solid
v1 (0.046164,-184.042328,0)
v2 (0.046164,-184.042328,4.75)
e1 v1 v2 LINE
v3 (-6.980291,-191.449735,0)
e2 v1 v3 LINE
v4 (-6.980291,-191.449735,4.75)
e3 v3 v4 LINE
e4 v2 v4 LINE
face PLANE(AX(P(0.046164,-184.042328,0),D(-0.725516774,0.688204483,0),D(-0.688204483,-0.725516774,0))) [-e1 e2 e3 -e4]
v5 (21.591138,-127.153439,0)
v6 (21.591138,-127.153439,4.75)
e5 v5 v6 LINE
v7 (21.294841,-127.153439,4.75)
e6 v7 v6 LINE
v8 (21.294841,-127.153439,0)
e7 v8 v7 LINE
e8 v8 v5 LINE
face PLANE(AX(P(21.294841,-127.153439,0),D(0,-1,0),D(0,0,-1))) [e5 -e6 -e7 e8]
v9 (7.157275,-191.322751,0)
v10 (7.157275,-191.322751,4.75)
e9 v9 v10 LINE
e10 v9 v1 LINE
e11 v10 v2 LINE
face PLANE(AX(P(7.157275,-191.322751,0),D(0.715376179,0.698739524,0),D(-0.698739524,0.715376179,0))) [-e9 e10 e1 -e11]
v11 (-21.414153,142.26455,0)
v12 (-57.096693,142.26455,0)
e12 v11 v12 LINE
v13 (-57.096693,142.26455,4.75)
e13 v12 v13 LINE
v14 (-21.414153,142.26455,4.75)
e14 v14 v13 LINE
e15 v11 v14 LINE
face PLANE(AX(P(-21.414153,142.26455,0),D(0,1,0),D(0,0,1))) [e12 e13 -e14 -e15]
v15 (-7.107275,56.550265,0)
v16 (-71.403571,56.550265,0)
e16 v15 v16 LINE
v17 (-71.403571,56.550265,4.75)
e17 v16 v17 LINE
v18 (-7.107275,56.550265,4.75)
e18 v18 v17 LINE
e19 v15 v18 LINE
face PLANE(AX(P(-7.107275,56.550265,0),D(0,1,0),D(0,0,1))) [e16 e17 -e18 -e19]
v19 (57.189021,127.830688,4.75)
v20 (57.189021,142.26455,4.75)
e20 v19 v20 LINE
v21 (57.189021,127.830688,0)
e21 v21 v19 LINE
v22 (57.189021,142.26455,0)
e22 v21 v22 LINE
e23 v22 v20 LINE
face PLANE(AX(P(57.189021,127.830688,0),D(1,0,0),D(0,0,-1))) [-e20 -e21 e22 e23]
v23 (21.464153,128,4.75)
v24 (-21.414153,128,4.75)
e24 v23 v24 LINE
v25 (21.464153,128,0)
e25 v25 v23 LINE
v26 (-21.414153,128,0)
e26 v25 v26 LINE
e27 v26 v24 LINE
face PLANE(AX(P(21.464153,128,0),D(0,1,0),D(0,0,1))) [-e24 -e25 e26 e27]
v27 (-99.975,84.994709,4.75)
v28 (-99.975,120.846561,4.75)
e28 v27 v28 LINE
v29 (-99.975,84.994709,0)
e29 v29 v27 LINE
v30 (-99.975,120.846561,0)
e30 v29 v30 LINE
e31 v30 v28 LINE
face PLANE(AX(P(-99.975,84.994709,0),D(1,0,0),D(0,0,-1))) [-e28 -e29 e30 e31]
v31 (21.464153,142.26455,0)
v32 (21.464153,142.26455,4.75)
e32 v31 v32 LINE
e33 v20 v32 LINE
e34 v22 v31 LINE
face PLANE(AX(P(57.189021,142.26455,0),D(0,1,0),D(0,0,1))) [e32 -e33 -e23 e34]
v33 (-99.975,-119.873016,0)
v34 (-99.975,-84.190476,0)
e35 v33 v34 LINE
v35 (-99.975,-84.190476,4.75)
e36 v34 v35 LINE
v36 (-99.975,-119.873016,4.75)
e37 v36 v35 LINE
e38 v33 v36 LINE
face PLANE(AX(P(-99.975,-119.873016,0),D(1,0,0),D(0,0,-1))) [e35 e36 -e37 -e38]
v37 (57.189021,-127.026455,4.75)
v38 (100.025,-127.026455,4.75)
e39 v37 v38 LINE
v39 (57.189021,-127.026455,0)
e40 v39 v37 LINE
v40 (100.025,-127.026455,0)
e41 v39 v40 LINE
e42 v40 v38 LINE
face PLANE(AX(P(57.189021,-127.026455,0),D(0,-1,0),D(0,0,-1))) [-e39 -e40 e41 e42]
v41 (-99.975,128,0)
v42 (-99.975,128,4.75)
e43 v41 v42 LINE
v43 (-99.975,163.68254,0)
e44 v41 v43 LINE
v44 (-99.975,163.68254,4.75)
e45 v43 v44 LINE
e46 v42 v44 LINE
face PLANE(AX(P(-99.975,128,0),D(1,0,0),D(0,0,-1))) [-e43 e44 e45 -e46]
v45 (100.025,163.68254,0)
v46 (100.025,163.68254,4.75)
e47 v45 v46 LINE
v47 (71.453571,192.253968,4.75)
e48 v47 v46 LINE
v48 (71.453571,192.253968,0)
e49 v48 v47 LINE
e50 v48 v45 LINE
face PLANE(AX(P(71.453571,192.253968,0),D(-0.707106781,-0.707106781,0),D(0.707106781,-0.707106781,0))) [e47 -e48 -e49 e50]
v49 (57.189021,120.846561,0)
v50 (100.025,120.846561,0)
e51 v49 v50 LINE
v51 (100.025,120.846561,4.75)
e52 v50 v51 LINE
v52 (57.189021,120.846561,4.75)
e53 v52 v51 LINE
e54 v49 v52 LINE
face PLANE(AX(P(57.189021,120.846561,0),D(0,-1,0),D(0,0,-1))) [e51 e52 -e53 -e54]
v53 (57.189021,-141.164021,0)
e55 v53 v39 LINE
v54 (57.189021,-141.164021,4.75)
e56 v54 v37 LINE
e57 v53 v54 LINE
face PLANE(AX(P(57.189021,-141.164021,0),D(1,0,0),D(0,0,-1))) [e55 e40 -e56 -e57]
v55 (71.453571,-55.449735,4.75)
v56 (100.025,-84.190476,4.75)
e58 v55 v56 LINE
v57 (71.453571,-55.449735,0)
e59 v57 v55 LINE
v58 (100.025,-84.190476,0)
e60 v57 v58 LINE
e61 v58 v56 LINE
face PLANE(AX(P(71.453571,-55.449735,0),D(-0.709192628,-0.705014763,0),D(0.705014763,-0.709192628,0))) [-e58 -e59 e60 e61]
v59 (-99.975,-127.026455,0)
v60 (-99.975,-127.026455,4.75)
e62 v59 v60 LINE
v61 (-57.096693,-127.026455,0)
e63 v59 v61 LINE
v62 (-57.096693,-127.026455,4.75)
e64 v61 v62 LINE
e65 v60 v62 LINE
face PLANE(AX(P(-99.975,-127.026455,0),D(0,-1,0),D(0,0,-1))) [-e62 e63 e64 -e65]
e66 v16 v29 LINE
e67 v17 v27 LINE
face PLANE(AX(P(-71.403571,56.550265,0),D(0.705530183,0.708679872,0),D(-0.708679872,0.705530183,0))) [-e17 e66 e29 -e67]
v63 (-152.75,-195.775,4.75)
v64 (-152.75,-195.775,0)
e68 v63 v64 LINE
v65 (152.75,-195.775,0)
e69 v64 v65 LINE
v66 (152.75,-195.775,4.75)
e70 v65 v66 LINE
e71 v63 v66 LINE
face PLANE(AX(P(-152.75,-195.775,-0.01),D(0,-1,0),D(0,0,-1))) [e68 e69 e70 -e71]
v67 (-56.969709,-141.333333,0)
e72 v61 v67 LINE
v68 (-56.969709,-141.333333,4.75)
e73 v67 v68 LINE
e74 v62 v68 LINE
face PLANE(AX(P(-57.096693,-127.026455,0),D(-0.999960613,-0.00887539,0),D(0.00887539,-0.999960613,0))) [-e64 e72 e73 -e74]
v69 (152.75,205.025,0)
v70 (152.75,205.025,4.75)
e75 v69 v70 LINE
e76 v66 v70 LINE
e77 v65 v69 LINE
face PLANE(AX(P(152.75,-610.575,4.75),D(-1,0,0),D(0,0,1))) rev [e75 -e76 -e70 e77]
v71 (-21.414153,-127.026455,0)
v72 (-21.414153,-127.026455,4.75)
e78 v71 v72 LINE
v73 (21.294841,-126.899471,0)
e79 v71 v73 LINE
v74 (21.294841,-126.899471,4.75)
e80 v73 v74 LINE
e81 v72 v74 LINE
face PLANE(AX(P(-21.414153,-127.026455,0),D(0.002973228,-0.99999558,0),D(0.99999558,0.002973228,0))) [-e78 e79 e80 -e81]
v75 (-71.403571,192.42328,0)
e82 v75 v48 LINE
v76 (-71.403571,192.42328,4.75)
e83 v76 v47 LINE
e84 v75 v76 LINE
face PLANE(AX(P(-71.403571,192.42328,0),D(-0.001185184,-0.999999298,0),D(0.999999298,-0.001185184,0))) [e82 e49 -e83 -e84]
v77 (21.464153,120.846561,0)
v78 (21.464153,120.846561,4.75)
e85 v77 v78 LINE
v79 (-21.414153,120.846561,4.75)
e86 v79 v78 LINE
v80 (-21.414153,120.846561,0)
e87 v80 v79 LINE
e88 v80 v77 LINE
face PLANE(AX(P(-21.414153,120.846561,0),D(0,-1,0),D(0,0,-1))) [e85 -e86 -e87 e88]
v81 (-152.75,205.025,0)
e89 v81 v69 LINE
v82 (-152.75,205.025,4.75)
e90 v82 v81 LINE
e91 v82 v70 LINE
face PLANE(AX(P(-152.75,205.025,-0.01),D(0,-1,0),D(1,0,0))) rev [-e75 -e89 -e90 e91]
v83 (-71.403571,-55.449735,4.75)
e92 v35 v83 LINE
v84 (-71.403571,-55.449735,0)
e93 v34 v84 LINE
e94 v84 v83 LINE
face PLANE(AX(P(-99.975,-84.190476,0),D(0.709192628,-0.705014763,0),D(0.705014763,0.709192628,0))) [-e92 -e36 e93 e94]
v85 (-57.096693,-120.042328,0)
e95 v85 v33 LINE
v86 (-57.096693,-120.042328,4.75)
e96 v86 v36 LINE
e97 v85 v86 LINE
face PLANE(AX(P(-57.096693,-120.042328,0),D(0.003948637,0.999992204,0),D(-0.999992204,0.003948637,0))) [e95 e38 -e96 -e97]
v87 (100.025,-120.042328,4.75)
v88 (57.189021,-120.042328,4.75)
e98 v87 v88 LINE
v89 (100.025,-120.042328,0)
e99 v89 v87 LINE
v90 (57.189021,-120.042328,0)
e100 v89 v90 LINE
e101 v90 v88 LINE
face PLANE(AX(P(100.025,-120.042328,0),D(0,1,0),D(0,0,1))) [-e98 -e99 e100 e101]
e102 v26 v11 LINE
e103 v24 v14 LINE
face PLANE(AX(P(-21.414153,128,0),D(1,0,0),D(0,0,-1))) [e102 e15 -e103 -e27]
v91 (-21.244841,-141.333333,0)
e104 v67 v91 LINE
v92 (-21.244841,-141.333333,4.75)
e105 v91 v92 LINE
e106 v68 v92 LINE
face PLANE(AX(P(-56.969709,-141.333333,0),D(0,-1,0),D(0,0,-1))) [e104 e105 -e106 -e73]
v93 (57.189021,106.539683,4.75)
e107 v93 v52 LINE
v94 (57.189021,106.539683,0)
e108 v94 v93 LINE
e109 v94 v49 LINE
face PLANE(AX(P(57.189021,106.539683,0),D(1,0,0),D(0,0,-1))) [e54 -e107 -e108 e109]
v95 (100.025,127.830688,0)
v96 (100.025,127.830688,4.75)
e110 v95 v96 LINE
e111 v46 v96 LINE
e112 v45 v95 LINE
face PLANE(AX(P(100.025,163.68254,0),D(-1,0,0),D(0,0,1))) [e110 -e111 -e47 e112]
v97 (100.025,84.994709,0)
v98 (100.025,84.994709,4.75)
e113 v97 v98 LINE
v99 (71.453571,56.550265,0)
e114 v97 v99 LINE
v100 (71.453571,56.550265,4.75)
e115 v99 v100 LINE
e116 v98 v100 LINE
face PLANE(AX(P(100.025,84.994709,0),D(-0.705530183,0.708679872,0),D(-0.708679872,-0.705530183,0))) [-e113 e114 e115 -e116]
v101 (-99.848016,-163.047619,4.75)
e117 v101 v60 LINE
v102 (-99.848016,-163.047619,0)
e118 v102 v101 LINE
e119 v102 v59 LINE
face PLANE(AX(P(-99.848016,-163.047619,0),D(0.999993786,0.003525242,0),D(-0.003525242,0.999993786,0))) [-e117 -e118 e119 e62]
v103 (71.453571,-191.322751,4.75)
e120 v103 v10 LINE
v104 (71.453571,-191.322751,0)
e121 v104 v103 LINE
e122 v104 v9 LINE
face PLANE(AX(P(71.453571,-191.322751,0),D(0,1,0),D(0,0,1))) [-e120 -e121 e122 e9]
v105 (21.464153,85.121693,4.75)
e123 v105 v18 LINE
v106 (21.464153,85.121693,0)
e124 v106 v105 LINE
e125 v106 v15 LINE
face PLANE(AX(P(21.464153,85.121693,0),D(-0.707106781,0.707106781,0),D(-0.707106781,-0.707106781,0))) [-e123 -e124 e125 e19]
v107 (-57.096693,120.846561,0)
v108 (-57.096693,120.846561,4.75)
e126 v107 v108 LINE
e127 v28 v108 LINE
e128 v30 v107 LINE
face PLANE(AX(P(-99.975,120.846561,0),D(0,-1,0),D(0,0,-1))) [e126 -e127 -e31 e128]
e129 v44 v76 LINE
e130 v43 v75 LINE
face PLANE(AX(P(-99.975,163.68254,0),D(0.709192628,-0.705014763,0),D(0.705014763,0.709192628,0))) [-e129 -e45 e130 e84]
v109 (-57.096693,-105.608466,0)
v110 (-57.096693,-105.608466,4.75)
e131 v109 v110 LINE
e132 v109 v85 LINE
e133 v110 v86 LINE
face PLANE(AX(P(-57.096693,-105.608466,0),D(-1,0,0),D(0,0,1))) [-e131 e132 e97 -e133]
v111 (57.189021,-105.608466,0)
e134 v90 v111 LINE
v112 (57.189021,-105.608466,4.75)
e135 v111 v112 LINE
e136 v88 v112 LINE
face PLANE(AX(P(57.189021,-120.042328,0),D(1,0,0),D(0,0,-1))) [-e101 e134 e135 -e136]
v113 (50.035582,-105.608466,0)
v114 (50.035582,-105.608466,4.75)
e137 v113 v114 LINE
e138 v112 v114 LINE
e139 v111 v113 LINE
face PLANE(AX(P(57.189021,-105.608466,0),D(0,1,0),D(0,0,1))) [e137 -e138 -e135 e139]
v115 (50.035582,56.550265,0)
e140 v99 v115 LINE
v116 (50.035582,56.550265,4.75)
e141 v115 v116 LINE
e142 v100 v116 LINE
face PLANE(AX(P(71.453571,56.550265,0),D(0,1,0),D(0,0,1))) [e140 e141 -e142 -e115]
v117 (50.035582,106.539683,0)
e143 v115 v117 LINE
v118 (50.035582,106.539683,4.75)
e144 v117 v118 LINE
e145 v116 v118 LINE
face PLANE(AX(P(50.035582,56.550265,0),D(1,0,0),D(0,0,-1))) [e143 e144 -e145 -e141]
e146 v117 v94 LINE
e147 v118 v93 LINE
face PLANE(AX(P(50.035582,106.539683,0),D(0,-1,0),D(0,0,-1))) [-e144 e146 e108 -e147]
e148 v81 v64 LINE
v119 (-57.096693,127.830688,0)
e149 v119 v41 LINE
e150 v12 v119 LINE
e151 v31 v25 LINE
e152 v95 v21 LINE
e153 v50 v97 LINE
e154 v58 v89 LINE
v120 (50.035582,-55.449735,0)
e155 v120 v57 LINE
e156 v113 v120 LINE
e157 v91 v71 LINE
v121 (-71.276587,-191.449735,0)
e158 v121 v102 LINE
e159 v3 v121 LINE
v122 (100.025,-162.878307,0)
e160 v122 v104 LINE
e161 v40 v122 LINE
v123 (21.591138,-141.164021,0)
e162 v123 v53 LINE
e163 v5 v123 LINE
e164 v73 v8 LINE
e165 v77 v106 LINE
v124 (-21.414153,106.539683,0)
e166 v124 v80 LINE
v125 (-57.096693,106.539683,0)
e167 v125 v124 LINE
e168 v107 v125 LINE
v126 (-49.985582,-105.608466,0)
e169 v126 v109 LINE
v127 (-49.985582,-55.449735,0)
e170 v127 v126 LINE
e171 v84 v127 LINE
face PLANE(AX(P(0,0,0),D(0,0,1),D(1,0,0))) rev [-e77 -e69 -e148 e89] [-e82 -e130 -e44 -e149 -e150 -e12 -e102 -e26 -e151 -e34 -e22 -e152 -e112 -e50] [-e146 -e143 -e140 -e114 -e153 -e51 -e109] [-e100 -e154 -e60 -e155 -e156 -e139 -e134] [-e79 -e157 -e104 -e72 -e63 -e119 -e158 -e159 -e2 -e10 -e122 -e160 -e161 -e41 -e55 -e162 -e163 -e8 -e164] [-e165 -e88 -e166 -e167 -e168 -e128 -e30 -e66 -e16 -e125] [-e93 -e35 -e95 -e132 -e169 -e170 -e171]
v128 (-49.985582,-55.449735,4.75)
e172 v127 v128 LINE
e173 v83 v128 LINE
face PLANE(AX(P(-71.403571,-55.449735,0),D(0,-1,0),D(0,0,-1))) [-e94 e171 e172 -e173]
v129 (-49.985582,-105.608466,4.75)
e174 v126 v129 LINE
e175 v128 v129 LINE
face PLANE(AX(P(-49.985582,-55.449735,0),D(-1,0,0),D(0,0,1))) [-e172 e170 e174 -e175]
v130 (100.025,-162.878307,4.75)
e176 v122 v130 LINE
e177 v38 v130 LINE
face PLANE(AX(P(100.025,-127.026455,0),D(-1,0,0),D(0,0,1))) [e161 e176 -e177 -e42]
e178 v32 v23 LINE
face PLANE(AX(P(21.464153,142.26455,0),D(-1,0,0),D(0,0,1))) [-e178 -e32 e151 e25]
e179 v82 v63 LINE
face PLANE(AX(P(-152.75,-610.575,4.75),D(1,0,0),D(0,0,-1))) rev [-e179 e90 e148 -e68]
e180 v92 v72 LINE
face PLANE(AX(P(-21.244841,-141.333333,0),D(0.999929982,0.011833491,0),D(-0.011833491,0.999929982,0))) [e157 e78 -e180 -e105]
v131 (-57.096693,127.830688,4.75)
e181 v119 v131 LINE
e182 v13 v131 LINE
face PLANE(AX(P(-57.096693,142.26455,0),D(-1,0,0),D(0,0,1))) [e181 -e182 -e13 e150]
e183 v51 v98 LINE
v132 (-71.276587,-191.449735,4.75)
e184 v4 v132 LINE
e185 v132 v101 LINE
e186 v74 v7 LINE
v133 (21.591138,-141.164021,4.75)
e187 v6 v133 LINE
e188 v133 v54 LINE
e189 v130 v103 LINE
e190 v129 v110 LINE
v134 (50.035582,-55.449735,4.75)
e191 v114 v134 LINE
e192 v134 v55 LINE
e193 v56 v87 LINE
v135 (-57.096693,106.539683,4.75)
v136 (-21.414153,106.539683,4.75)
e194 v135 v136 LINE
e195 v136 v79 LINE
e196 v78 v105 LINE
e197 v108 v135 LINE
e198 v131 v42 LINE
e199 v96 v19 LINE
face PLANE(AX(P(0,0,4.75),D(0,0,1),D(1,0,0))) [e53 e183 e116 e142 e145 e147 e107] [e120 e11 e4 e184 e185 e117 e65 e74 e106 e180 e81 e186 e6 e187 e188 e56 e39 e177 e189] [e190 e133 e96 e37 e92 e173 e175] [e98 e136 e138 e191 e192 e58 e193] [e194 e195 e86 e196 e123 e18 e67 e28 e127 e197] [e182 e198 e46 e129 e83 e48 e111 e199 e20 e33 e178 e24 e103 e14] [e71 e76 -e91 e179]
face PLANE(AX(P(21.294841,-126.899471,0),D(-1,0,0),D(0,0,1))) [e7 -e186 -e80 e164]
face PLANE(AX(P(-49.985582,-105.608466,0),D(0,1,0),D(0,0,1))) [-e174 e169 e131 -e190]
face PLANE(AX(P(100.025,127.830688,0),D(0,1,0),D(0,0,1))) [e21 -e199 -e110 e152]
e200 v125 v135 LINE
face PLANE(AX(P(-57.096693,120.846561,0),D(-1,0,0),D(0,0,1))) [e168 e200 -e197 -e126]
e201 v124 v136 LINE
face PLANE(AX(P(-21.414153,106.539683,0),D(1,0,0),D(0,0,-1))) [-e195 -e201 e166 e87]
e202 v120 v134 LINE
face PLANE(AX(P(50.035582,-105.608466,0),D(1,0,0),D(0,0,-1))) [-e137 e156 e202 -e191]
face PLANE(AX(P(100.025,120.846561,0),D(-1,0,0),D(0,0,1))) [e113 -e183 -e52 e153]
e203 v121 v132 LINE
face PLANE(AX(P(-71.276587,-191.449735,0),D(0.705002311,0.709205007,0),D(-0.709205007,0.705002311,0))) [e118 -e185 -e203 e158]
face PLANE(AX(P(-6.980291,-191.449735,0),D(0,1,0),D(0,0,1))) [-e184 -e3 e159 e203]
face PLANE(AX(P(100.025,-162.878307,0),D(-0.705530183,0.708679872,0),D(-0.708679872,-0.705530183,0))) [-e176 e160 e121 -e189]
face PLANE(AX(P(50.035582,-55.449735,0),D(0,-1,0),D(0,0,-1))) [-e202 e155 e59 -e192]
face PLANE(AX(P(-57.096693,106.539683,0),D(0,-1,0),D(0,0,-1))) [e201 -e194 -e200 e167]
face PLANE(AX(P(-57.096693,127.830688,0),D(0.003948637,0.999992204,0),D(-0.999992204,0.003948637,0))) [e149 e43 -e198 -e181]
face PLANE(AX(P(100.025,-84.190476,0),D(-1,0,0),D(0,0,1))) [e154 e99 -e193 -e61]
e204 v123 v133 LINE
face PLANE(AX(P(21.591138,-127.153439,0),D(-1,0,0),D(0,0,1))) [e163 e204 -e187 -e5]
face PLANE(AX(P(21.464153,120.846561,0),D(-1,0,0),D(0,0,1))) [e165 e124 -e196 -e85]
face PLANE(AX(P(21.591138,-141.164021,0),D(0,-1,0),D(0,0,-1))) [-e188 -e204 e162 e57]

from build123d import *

# Parameters (mm, degrees)
SKETCH_1_W                 = 305.5
SKETCH_1_H                 = 1221.15
EXTRUDE_1_DEPTH            = 4.75
CUT_EXTRUDE_2_DEPTH        = 4.75
SPLIT_START                = 205.025
SPLIT_BODIES_2_OUTLINE_W   = 305.5
SPLIT_BODIES_2_OUTLINE_H   = 4.75
SPLIT_BODIES_2_DEPTH       = 405.55
SPLIT_START_2              = -610.575
SPLIT_BODIES_2_2_OUTLINE_W = 305.5
SPLIT_BODIES_2_2_OUTLINE_H = 4.75
SPLIT_BODIES_2_2_DEPTH     = 414.8


# Read off the part's stored shape, not the designer's step: 分割2
with BuildPart() as part:
    # 草圖1 → 填料-伸長1 (new body)
    with BuildSketch(Plane.XY):
        Rectangle(SKETCH_1_W, SKETCH_1_H)
    extrude(amount=EXTRUDE_1_DEPTH)

    # 草圖2 → 除料-伸長2 (cut)
    with BuildSketch(Plane.XY.offset(4.75)):
        Polygon((100.025, 354.412698413), (100.025, 304.423280423), (-83.25542328, 382.984126984), (-99.975, 390.137566138), (-99.975, 440.126984127), (83.30542328, 361.566137566), align=None)
        Polygon((57.189021164, 380.021164021), (57.189021164, 440.126984127), (100.025, 440.126984127), (100.025, 361.566137566), align=None)
        Polygon((50.035582011, 106.53968254), (57.189021164, 106.53968254), (57.189021164, 120.846560847), (100.025, 120.846560847), (100.025, 84.994708995), (71.453571429, 56.55026455), (50.035582011, 56.55026455), align=None)
        Polygon((-71.403571429, 56.55026455), (-99.975, 84.994708995), (-99.975, 120.846560847), (-57.096693122, 120.846560847), (-57.096693122, 106.53968254), (-21.414153439, 106.53968254), (-21.414153439, 120.846560847), (21.464153439, 120.846560847), (21.464153439, 85.121693122), (-7.107275132, 56.55026455), align=None)
        Polygon((-21.414153439, 142.264550265), (-57.096693122, 142.264550265), (-57.096693122, 127.830687831), (-99.975, 128), (-99.975, 163.682539683), (-71.403571429, 192.423280423), (71.453571429, 192.253968254), (100.025, 163.682539683), (100.025, 127.830687831), (57.189021164, 127.830687831), (57.189021164, 142.264550265), (21.464153439, 142.264550265), (21.464153439, 128), (-21.414153439, 128), align=None)
        Polygon((21.591137566, -141.164021164), (57.189021164, -141.164021164), (57.189021164, -127.026455026), (100.025, -127.026455026), (100.025, -162.878306878), (71.453571429, -191.322751323), (7.157275132, -191.322751323), (0.046164021, -184.042328042), (-6.980291005, -191.44973545), (-71.276587302, -191.44973545), (-99.848015873, -163.047619048), (-99.975, -127.026455026), (-57.096693122, -127.026455026), (-56.969708995, -141.333333333), (-21.24484127, -141.333333333), (-21.414153439, -127.026455026), (21.29484127, -126.899470899), (21.29484127, -127.153439153), (21.591137566, -127.153439153), align=None)
        Polygon((50.035582011, -55.44973545), (71.453571429, -55.44973545), (100.025, -84.19047619), (100.025, -120.042328042), (57.189021164, -120.042328042), (57.189021164, -105.608465608), (50.035582011, -105.608465608), align=None)
        Polygon((-49.985582011, -105.608465608), (-57.096693122, -105.608465608), (-57.096693122, -120.042328042), (-99.975, -119.873015873), (-99.975, -84.19047619), (-71.403571429, -55.44973545), (-49.985582011, -55.44973545), align=None)
        Polygon((50.035582011, -389.206349206), (57.189021164, -389.206349206), (57.189021164, -374.899470899), (100.025, -374.899470899), (100.025, -410.751322751), (71.453571429, -439.195767196), (50.035582011, -439.195767196), align=None)
        Polygon((-71.403571429, -439.195767196), (-99.975, -410.751322751), (-99.975, -374.899470899), (-57.096693122, -374.899470899), (-57.096693122, -389.206349206), (-21.414153439, -389.206349206), (-21.414153439, -374.899470899), (21.464153439, -374.899470899), (21.464153439, -410.624338624), (-7.107275132, -439.195767196), align=None)
        Polygon((-21.414153439, -353.481481481), (-57.096693122, -353.481481481), (-57.096693122, -367.915343915), (-99.975, -367.746031746), (-99.975, -332.063492063), (-71.403571429, -303.322751323), (71.453571429, -303.492063492), (100.025, -332.063492063), (100.025, -367.915343915), (57.189021164, -367.915343915), (57.189021164, -353.481481481), (21.464153439, -353.481481481), (21.464153439, -367.746031746), (-21.414153439, -367.746031746), align=None)
    extrude(amount=-CUT_EXTRUDE_2_DEPTH, mode=Mode.SUBTRACT)

    # Split Bodies 2 outline → Split Bodies 2 (cut)
    with BuildSketch(Plane(origin=(0, 0, 0), x_dir=(1, 0, 0), z_dir=(0, 1, 0)).offset(SPLIT_START)):
        with Locations((0, -2.375)):
            Rectangle(SPLIT_BODIES_2_OUTLINE_W, SPLIT_BODIES_2_OUTLINE_H)
    extrude(amount=SPLIT_BODIES_2_DEPTH, mode=Mode.SUBTRACT)

    # Split Bodies 2 2 outline → Split Bodies 2 2 (cut)
    with BuildSketch(Plane(origin=(0, 0, 0), x_dir=(1, 0, 0), z_dir=(0, 1, 0)).offset(SPLIT_START_2)):
        with Locations((0, -2.375)):
            Rectangle(SPLIT_BODIES_2_2_OUTLINE_W, SPLIT_BODIES_2_2_OUTLINE_H)
    extrude(amount=SPLIT_BODIES_2_2_DEPTH, mode=Mode.SUBTRACT)


solid = part.part
